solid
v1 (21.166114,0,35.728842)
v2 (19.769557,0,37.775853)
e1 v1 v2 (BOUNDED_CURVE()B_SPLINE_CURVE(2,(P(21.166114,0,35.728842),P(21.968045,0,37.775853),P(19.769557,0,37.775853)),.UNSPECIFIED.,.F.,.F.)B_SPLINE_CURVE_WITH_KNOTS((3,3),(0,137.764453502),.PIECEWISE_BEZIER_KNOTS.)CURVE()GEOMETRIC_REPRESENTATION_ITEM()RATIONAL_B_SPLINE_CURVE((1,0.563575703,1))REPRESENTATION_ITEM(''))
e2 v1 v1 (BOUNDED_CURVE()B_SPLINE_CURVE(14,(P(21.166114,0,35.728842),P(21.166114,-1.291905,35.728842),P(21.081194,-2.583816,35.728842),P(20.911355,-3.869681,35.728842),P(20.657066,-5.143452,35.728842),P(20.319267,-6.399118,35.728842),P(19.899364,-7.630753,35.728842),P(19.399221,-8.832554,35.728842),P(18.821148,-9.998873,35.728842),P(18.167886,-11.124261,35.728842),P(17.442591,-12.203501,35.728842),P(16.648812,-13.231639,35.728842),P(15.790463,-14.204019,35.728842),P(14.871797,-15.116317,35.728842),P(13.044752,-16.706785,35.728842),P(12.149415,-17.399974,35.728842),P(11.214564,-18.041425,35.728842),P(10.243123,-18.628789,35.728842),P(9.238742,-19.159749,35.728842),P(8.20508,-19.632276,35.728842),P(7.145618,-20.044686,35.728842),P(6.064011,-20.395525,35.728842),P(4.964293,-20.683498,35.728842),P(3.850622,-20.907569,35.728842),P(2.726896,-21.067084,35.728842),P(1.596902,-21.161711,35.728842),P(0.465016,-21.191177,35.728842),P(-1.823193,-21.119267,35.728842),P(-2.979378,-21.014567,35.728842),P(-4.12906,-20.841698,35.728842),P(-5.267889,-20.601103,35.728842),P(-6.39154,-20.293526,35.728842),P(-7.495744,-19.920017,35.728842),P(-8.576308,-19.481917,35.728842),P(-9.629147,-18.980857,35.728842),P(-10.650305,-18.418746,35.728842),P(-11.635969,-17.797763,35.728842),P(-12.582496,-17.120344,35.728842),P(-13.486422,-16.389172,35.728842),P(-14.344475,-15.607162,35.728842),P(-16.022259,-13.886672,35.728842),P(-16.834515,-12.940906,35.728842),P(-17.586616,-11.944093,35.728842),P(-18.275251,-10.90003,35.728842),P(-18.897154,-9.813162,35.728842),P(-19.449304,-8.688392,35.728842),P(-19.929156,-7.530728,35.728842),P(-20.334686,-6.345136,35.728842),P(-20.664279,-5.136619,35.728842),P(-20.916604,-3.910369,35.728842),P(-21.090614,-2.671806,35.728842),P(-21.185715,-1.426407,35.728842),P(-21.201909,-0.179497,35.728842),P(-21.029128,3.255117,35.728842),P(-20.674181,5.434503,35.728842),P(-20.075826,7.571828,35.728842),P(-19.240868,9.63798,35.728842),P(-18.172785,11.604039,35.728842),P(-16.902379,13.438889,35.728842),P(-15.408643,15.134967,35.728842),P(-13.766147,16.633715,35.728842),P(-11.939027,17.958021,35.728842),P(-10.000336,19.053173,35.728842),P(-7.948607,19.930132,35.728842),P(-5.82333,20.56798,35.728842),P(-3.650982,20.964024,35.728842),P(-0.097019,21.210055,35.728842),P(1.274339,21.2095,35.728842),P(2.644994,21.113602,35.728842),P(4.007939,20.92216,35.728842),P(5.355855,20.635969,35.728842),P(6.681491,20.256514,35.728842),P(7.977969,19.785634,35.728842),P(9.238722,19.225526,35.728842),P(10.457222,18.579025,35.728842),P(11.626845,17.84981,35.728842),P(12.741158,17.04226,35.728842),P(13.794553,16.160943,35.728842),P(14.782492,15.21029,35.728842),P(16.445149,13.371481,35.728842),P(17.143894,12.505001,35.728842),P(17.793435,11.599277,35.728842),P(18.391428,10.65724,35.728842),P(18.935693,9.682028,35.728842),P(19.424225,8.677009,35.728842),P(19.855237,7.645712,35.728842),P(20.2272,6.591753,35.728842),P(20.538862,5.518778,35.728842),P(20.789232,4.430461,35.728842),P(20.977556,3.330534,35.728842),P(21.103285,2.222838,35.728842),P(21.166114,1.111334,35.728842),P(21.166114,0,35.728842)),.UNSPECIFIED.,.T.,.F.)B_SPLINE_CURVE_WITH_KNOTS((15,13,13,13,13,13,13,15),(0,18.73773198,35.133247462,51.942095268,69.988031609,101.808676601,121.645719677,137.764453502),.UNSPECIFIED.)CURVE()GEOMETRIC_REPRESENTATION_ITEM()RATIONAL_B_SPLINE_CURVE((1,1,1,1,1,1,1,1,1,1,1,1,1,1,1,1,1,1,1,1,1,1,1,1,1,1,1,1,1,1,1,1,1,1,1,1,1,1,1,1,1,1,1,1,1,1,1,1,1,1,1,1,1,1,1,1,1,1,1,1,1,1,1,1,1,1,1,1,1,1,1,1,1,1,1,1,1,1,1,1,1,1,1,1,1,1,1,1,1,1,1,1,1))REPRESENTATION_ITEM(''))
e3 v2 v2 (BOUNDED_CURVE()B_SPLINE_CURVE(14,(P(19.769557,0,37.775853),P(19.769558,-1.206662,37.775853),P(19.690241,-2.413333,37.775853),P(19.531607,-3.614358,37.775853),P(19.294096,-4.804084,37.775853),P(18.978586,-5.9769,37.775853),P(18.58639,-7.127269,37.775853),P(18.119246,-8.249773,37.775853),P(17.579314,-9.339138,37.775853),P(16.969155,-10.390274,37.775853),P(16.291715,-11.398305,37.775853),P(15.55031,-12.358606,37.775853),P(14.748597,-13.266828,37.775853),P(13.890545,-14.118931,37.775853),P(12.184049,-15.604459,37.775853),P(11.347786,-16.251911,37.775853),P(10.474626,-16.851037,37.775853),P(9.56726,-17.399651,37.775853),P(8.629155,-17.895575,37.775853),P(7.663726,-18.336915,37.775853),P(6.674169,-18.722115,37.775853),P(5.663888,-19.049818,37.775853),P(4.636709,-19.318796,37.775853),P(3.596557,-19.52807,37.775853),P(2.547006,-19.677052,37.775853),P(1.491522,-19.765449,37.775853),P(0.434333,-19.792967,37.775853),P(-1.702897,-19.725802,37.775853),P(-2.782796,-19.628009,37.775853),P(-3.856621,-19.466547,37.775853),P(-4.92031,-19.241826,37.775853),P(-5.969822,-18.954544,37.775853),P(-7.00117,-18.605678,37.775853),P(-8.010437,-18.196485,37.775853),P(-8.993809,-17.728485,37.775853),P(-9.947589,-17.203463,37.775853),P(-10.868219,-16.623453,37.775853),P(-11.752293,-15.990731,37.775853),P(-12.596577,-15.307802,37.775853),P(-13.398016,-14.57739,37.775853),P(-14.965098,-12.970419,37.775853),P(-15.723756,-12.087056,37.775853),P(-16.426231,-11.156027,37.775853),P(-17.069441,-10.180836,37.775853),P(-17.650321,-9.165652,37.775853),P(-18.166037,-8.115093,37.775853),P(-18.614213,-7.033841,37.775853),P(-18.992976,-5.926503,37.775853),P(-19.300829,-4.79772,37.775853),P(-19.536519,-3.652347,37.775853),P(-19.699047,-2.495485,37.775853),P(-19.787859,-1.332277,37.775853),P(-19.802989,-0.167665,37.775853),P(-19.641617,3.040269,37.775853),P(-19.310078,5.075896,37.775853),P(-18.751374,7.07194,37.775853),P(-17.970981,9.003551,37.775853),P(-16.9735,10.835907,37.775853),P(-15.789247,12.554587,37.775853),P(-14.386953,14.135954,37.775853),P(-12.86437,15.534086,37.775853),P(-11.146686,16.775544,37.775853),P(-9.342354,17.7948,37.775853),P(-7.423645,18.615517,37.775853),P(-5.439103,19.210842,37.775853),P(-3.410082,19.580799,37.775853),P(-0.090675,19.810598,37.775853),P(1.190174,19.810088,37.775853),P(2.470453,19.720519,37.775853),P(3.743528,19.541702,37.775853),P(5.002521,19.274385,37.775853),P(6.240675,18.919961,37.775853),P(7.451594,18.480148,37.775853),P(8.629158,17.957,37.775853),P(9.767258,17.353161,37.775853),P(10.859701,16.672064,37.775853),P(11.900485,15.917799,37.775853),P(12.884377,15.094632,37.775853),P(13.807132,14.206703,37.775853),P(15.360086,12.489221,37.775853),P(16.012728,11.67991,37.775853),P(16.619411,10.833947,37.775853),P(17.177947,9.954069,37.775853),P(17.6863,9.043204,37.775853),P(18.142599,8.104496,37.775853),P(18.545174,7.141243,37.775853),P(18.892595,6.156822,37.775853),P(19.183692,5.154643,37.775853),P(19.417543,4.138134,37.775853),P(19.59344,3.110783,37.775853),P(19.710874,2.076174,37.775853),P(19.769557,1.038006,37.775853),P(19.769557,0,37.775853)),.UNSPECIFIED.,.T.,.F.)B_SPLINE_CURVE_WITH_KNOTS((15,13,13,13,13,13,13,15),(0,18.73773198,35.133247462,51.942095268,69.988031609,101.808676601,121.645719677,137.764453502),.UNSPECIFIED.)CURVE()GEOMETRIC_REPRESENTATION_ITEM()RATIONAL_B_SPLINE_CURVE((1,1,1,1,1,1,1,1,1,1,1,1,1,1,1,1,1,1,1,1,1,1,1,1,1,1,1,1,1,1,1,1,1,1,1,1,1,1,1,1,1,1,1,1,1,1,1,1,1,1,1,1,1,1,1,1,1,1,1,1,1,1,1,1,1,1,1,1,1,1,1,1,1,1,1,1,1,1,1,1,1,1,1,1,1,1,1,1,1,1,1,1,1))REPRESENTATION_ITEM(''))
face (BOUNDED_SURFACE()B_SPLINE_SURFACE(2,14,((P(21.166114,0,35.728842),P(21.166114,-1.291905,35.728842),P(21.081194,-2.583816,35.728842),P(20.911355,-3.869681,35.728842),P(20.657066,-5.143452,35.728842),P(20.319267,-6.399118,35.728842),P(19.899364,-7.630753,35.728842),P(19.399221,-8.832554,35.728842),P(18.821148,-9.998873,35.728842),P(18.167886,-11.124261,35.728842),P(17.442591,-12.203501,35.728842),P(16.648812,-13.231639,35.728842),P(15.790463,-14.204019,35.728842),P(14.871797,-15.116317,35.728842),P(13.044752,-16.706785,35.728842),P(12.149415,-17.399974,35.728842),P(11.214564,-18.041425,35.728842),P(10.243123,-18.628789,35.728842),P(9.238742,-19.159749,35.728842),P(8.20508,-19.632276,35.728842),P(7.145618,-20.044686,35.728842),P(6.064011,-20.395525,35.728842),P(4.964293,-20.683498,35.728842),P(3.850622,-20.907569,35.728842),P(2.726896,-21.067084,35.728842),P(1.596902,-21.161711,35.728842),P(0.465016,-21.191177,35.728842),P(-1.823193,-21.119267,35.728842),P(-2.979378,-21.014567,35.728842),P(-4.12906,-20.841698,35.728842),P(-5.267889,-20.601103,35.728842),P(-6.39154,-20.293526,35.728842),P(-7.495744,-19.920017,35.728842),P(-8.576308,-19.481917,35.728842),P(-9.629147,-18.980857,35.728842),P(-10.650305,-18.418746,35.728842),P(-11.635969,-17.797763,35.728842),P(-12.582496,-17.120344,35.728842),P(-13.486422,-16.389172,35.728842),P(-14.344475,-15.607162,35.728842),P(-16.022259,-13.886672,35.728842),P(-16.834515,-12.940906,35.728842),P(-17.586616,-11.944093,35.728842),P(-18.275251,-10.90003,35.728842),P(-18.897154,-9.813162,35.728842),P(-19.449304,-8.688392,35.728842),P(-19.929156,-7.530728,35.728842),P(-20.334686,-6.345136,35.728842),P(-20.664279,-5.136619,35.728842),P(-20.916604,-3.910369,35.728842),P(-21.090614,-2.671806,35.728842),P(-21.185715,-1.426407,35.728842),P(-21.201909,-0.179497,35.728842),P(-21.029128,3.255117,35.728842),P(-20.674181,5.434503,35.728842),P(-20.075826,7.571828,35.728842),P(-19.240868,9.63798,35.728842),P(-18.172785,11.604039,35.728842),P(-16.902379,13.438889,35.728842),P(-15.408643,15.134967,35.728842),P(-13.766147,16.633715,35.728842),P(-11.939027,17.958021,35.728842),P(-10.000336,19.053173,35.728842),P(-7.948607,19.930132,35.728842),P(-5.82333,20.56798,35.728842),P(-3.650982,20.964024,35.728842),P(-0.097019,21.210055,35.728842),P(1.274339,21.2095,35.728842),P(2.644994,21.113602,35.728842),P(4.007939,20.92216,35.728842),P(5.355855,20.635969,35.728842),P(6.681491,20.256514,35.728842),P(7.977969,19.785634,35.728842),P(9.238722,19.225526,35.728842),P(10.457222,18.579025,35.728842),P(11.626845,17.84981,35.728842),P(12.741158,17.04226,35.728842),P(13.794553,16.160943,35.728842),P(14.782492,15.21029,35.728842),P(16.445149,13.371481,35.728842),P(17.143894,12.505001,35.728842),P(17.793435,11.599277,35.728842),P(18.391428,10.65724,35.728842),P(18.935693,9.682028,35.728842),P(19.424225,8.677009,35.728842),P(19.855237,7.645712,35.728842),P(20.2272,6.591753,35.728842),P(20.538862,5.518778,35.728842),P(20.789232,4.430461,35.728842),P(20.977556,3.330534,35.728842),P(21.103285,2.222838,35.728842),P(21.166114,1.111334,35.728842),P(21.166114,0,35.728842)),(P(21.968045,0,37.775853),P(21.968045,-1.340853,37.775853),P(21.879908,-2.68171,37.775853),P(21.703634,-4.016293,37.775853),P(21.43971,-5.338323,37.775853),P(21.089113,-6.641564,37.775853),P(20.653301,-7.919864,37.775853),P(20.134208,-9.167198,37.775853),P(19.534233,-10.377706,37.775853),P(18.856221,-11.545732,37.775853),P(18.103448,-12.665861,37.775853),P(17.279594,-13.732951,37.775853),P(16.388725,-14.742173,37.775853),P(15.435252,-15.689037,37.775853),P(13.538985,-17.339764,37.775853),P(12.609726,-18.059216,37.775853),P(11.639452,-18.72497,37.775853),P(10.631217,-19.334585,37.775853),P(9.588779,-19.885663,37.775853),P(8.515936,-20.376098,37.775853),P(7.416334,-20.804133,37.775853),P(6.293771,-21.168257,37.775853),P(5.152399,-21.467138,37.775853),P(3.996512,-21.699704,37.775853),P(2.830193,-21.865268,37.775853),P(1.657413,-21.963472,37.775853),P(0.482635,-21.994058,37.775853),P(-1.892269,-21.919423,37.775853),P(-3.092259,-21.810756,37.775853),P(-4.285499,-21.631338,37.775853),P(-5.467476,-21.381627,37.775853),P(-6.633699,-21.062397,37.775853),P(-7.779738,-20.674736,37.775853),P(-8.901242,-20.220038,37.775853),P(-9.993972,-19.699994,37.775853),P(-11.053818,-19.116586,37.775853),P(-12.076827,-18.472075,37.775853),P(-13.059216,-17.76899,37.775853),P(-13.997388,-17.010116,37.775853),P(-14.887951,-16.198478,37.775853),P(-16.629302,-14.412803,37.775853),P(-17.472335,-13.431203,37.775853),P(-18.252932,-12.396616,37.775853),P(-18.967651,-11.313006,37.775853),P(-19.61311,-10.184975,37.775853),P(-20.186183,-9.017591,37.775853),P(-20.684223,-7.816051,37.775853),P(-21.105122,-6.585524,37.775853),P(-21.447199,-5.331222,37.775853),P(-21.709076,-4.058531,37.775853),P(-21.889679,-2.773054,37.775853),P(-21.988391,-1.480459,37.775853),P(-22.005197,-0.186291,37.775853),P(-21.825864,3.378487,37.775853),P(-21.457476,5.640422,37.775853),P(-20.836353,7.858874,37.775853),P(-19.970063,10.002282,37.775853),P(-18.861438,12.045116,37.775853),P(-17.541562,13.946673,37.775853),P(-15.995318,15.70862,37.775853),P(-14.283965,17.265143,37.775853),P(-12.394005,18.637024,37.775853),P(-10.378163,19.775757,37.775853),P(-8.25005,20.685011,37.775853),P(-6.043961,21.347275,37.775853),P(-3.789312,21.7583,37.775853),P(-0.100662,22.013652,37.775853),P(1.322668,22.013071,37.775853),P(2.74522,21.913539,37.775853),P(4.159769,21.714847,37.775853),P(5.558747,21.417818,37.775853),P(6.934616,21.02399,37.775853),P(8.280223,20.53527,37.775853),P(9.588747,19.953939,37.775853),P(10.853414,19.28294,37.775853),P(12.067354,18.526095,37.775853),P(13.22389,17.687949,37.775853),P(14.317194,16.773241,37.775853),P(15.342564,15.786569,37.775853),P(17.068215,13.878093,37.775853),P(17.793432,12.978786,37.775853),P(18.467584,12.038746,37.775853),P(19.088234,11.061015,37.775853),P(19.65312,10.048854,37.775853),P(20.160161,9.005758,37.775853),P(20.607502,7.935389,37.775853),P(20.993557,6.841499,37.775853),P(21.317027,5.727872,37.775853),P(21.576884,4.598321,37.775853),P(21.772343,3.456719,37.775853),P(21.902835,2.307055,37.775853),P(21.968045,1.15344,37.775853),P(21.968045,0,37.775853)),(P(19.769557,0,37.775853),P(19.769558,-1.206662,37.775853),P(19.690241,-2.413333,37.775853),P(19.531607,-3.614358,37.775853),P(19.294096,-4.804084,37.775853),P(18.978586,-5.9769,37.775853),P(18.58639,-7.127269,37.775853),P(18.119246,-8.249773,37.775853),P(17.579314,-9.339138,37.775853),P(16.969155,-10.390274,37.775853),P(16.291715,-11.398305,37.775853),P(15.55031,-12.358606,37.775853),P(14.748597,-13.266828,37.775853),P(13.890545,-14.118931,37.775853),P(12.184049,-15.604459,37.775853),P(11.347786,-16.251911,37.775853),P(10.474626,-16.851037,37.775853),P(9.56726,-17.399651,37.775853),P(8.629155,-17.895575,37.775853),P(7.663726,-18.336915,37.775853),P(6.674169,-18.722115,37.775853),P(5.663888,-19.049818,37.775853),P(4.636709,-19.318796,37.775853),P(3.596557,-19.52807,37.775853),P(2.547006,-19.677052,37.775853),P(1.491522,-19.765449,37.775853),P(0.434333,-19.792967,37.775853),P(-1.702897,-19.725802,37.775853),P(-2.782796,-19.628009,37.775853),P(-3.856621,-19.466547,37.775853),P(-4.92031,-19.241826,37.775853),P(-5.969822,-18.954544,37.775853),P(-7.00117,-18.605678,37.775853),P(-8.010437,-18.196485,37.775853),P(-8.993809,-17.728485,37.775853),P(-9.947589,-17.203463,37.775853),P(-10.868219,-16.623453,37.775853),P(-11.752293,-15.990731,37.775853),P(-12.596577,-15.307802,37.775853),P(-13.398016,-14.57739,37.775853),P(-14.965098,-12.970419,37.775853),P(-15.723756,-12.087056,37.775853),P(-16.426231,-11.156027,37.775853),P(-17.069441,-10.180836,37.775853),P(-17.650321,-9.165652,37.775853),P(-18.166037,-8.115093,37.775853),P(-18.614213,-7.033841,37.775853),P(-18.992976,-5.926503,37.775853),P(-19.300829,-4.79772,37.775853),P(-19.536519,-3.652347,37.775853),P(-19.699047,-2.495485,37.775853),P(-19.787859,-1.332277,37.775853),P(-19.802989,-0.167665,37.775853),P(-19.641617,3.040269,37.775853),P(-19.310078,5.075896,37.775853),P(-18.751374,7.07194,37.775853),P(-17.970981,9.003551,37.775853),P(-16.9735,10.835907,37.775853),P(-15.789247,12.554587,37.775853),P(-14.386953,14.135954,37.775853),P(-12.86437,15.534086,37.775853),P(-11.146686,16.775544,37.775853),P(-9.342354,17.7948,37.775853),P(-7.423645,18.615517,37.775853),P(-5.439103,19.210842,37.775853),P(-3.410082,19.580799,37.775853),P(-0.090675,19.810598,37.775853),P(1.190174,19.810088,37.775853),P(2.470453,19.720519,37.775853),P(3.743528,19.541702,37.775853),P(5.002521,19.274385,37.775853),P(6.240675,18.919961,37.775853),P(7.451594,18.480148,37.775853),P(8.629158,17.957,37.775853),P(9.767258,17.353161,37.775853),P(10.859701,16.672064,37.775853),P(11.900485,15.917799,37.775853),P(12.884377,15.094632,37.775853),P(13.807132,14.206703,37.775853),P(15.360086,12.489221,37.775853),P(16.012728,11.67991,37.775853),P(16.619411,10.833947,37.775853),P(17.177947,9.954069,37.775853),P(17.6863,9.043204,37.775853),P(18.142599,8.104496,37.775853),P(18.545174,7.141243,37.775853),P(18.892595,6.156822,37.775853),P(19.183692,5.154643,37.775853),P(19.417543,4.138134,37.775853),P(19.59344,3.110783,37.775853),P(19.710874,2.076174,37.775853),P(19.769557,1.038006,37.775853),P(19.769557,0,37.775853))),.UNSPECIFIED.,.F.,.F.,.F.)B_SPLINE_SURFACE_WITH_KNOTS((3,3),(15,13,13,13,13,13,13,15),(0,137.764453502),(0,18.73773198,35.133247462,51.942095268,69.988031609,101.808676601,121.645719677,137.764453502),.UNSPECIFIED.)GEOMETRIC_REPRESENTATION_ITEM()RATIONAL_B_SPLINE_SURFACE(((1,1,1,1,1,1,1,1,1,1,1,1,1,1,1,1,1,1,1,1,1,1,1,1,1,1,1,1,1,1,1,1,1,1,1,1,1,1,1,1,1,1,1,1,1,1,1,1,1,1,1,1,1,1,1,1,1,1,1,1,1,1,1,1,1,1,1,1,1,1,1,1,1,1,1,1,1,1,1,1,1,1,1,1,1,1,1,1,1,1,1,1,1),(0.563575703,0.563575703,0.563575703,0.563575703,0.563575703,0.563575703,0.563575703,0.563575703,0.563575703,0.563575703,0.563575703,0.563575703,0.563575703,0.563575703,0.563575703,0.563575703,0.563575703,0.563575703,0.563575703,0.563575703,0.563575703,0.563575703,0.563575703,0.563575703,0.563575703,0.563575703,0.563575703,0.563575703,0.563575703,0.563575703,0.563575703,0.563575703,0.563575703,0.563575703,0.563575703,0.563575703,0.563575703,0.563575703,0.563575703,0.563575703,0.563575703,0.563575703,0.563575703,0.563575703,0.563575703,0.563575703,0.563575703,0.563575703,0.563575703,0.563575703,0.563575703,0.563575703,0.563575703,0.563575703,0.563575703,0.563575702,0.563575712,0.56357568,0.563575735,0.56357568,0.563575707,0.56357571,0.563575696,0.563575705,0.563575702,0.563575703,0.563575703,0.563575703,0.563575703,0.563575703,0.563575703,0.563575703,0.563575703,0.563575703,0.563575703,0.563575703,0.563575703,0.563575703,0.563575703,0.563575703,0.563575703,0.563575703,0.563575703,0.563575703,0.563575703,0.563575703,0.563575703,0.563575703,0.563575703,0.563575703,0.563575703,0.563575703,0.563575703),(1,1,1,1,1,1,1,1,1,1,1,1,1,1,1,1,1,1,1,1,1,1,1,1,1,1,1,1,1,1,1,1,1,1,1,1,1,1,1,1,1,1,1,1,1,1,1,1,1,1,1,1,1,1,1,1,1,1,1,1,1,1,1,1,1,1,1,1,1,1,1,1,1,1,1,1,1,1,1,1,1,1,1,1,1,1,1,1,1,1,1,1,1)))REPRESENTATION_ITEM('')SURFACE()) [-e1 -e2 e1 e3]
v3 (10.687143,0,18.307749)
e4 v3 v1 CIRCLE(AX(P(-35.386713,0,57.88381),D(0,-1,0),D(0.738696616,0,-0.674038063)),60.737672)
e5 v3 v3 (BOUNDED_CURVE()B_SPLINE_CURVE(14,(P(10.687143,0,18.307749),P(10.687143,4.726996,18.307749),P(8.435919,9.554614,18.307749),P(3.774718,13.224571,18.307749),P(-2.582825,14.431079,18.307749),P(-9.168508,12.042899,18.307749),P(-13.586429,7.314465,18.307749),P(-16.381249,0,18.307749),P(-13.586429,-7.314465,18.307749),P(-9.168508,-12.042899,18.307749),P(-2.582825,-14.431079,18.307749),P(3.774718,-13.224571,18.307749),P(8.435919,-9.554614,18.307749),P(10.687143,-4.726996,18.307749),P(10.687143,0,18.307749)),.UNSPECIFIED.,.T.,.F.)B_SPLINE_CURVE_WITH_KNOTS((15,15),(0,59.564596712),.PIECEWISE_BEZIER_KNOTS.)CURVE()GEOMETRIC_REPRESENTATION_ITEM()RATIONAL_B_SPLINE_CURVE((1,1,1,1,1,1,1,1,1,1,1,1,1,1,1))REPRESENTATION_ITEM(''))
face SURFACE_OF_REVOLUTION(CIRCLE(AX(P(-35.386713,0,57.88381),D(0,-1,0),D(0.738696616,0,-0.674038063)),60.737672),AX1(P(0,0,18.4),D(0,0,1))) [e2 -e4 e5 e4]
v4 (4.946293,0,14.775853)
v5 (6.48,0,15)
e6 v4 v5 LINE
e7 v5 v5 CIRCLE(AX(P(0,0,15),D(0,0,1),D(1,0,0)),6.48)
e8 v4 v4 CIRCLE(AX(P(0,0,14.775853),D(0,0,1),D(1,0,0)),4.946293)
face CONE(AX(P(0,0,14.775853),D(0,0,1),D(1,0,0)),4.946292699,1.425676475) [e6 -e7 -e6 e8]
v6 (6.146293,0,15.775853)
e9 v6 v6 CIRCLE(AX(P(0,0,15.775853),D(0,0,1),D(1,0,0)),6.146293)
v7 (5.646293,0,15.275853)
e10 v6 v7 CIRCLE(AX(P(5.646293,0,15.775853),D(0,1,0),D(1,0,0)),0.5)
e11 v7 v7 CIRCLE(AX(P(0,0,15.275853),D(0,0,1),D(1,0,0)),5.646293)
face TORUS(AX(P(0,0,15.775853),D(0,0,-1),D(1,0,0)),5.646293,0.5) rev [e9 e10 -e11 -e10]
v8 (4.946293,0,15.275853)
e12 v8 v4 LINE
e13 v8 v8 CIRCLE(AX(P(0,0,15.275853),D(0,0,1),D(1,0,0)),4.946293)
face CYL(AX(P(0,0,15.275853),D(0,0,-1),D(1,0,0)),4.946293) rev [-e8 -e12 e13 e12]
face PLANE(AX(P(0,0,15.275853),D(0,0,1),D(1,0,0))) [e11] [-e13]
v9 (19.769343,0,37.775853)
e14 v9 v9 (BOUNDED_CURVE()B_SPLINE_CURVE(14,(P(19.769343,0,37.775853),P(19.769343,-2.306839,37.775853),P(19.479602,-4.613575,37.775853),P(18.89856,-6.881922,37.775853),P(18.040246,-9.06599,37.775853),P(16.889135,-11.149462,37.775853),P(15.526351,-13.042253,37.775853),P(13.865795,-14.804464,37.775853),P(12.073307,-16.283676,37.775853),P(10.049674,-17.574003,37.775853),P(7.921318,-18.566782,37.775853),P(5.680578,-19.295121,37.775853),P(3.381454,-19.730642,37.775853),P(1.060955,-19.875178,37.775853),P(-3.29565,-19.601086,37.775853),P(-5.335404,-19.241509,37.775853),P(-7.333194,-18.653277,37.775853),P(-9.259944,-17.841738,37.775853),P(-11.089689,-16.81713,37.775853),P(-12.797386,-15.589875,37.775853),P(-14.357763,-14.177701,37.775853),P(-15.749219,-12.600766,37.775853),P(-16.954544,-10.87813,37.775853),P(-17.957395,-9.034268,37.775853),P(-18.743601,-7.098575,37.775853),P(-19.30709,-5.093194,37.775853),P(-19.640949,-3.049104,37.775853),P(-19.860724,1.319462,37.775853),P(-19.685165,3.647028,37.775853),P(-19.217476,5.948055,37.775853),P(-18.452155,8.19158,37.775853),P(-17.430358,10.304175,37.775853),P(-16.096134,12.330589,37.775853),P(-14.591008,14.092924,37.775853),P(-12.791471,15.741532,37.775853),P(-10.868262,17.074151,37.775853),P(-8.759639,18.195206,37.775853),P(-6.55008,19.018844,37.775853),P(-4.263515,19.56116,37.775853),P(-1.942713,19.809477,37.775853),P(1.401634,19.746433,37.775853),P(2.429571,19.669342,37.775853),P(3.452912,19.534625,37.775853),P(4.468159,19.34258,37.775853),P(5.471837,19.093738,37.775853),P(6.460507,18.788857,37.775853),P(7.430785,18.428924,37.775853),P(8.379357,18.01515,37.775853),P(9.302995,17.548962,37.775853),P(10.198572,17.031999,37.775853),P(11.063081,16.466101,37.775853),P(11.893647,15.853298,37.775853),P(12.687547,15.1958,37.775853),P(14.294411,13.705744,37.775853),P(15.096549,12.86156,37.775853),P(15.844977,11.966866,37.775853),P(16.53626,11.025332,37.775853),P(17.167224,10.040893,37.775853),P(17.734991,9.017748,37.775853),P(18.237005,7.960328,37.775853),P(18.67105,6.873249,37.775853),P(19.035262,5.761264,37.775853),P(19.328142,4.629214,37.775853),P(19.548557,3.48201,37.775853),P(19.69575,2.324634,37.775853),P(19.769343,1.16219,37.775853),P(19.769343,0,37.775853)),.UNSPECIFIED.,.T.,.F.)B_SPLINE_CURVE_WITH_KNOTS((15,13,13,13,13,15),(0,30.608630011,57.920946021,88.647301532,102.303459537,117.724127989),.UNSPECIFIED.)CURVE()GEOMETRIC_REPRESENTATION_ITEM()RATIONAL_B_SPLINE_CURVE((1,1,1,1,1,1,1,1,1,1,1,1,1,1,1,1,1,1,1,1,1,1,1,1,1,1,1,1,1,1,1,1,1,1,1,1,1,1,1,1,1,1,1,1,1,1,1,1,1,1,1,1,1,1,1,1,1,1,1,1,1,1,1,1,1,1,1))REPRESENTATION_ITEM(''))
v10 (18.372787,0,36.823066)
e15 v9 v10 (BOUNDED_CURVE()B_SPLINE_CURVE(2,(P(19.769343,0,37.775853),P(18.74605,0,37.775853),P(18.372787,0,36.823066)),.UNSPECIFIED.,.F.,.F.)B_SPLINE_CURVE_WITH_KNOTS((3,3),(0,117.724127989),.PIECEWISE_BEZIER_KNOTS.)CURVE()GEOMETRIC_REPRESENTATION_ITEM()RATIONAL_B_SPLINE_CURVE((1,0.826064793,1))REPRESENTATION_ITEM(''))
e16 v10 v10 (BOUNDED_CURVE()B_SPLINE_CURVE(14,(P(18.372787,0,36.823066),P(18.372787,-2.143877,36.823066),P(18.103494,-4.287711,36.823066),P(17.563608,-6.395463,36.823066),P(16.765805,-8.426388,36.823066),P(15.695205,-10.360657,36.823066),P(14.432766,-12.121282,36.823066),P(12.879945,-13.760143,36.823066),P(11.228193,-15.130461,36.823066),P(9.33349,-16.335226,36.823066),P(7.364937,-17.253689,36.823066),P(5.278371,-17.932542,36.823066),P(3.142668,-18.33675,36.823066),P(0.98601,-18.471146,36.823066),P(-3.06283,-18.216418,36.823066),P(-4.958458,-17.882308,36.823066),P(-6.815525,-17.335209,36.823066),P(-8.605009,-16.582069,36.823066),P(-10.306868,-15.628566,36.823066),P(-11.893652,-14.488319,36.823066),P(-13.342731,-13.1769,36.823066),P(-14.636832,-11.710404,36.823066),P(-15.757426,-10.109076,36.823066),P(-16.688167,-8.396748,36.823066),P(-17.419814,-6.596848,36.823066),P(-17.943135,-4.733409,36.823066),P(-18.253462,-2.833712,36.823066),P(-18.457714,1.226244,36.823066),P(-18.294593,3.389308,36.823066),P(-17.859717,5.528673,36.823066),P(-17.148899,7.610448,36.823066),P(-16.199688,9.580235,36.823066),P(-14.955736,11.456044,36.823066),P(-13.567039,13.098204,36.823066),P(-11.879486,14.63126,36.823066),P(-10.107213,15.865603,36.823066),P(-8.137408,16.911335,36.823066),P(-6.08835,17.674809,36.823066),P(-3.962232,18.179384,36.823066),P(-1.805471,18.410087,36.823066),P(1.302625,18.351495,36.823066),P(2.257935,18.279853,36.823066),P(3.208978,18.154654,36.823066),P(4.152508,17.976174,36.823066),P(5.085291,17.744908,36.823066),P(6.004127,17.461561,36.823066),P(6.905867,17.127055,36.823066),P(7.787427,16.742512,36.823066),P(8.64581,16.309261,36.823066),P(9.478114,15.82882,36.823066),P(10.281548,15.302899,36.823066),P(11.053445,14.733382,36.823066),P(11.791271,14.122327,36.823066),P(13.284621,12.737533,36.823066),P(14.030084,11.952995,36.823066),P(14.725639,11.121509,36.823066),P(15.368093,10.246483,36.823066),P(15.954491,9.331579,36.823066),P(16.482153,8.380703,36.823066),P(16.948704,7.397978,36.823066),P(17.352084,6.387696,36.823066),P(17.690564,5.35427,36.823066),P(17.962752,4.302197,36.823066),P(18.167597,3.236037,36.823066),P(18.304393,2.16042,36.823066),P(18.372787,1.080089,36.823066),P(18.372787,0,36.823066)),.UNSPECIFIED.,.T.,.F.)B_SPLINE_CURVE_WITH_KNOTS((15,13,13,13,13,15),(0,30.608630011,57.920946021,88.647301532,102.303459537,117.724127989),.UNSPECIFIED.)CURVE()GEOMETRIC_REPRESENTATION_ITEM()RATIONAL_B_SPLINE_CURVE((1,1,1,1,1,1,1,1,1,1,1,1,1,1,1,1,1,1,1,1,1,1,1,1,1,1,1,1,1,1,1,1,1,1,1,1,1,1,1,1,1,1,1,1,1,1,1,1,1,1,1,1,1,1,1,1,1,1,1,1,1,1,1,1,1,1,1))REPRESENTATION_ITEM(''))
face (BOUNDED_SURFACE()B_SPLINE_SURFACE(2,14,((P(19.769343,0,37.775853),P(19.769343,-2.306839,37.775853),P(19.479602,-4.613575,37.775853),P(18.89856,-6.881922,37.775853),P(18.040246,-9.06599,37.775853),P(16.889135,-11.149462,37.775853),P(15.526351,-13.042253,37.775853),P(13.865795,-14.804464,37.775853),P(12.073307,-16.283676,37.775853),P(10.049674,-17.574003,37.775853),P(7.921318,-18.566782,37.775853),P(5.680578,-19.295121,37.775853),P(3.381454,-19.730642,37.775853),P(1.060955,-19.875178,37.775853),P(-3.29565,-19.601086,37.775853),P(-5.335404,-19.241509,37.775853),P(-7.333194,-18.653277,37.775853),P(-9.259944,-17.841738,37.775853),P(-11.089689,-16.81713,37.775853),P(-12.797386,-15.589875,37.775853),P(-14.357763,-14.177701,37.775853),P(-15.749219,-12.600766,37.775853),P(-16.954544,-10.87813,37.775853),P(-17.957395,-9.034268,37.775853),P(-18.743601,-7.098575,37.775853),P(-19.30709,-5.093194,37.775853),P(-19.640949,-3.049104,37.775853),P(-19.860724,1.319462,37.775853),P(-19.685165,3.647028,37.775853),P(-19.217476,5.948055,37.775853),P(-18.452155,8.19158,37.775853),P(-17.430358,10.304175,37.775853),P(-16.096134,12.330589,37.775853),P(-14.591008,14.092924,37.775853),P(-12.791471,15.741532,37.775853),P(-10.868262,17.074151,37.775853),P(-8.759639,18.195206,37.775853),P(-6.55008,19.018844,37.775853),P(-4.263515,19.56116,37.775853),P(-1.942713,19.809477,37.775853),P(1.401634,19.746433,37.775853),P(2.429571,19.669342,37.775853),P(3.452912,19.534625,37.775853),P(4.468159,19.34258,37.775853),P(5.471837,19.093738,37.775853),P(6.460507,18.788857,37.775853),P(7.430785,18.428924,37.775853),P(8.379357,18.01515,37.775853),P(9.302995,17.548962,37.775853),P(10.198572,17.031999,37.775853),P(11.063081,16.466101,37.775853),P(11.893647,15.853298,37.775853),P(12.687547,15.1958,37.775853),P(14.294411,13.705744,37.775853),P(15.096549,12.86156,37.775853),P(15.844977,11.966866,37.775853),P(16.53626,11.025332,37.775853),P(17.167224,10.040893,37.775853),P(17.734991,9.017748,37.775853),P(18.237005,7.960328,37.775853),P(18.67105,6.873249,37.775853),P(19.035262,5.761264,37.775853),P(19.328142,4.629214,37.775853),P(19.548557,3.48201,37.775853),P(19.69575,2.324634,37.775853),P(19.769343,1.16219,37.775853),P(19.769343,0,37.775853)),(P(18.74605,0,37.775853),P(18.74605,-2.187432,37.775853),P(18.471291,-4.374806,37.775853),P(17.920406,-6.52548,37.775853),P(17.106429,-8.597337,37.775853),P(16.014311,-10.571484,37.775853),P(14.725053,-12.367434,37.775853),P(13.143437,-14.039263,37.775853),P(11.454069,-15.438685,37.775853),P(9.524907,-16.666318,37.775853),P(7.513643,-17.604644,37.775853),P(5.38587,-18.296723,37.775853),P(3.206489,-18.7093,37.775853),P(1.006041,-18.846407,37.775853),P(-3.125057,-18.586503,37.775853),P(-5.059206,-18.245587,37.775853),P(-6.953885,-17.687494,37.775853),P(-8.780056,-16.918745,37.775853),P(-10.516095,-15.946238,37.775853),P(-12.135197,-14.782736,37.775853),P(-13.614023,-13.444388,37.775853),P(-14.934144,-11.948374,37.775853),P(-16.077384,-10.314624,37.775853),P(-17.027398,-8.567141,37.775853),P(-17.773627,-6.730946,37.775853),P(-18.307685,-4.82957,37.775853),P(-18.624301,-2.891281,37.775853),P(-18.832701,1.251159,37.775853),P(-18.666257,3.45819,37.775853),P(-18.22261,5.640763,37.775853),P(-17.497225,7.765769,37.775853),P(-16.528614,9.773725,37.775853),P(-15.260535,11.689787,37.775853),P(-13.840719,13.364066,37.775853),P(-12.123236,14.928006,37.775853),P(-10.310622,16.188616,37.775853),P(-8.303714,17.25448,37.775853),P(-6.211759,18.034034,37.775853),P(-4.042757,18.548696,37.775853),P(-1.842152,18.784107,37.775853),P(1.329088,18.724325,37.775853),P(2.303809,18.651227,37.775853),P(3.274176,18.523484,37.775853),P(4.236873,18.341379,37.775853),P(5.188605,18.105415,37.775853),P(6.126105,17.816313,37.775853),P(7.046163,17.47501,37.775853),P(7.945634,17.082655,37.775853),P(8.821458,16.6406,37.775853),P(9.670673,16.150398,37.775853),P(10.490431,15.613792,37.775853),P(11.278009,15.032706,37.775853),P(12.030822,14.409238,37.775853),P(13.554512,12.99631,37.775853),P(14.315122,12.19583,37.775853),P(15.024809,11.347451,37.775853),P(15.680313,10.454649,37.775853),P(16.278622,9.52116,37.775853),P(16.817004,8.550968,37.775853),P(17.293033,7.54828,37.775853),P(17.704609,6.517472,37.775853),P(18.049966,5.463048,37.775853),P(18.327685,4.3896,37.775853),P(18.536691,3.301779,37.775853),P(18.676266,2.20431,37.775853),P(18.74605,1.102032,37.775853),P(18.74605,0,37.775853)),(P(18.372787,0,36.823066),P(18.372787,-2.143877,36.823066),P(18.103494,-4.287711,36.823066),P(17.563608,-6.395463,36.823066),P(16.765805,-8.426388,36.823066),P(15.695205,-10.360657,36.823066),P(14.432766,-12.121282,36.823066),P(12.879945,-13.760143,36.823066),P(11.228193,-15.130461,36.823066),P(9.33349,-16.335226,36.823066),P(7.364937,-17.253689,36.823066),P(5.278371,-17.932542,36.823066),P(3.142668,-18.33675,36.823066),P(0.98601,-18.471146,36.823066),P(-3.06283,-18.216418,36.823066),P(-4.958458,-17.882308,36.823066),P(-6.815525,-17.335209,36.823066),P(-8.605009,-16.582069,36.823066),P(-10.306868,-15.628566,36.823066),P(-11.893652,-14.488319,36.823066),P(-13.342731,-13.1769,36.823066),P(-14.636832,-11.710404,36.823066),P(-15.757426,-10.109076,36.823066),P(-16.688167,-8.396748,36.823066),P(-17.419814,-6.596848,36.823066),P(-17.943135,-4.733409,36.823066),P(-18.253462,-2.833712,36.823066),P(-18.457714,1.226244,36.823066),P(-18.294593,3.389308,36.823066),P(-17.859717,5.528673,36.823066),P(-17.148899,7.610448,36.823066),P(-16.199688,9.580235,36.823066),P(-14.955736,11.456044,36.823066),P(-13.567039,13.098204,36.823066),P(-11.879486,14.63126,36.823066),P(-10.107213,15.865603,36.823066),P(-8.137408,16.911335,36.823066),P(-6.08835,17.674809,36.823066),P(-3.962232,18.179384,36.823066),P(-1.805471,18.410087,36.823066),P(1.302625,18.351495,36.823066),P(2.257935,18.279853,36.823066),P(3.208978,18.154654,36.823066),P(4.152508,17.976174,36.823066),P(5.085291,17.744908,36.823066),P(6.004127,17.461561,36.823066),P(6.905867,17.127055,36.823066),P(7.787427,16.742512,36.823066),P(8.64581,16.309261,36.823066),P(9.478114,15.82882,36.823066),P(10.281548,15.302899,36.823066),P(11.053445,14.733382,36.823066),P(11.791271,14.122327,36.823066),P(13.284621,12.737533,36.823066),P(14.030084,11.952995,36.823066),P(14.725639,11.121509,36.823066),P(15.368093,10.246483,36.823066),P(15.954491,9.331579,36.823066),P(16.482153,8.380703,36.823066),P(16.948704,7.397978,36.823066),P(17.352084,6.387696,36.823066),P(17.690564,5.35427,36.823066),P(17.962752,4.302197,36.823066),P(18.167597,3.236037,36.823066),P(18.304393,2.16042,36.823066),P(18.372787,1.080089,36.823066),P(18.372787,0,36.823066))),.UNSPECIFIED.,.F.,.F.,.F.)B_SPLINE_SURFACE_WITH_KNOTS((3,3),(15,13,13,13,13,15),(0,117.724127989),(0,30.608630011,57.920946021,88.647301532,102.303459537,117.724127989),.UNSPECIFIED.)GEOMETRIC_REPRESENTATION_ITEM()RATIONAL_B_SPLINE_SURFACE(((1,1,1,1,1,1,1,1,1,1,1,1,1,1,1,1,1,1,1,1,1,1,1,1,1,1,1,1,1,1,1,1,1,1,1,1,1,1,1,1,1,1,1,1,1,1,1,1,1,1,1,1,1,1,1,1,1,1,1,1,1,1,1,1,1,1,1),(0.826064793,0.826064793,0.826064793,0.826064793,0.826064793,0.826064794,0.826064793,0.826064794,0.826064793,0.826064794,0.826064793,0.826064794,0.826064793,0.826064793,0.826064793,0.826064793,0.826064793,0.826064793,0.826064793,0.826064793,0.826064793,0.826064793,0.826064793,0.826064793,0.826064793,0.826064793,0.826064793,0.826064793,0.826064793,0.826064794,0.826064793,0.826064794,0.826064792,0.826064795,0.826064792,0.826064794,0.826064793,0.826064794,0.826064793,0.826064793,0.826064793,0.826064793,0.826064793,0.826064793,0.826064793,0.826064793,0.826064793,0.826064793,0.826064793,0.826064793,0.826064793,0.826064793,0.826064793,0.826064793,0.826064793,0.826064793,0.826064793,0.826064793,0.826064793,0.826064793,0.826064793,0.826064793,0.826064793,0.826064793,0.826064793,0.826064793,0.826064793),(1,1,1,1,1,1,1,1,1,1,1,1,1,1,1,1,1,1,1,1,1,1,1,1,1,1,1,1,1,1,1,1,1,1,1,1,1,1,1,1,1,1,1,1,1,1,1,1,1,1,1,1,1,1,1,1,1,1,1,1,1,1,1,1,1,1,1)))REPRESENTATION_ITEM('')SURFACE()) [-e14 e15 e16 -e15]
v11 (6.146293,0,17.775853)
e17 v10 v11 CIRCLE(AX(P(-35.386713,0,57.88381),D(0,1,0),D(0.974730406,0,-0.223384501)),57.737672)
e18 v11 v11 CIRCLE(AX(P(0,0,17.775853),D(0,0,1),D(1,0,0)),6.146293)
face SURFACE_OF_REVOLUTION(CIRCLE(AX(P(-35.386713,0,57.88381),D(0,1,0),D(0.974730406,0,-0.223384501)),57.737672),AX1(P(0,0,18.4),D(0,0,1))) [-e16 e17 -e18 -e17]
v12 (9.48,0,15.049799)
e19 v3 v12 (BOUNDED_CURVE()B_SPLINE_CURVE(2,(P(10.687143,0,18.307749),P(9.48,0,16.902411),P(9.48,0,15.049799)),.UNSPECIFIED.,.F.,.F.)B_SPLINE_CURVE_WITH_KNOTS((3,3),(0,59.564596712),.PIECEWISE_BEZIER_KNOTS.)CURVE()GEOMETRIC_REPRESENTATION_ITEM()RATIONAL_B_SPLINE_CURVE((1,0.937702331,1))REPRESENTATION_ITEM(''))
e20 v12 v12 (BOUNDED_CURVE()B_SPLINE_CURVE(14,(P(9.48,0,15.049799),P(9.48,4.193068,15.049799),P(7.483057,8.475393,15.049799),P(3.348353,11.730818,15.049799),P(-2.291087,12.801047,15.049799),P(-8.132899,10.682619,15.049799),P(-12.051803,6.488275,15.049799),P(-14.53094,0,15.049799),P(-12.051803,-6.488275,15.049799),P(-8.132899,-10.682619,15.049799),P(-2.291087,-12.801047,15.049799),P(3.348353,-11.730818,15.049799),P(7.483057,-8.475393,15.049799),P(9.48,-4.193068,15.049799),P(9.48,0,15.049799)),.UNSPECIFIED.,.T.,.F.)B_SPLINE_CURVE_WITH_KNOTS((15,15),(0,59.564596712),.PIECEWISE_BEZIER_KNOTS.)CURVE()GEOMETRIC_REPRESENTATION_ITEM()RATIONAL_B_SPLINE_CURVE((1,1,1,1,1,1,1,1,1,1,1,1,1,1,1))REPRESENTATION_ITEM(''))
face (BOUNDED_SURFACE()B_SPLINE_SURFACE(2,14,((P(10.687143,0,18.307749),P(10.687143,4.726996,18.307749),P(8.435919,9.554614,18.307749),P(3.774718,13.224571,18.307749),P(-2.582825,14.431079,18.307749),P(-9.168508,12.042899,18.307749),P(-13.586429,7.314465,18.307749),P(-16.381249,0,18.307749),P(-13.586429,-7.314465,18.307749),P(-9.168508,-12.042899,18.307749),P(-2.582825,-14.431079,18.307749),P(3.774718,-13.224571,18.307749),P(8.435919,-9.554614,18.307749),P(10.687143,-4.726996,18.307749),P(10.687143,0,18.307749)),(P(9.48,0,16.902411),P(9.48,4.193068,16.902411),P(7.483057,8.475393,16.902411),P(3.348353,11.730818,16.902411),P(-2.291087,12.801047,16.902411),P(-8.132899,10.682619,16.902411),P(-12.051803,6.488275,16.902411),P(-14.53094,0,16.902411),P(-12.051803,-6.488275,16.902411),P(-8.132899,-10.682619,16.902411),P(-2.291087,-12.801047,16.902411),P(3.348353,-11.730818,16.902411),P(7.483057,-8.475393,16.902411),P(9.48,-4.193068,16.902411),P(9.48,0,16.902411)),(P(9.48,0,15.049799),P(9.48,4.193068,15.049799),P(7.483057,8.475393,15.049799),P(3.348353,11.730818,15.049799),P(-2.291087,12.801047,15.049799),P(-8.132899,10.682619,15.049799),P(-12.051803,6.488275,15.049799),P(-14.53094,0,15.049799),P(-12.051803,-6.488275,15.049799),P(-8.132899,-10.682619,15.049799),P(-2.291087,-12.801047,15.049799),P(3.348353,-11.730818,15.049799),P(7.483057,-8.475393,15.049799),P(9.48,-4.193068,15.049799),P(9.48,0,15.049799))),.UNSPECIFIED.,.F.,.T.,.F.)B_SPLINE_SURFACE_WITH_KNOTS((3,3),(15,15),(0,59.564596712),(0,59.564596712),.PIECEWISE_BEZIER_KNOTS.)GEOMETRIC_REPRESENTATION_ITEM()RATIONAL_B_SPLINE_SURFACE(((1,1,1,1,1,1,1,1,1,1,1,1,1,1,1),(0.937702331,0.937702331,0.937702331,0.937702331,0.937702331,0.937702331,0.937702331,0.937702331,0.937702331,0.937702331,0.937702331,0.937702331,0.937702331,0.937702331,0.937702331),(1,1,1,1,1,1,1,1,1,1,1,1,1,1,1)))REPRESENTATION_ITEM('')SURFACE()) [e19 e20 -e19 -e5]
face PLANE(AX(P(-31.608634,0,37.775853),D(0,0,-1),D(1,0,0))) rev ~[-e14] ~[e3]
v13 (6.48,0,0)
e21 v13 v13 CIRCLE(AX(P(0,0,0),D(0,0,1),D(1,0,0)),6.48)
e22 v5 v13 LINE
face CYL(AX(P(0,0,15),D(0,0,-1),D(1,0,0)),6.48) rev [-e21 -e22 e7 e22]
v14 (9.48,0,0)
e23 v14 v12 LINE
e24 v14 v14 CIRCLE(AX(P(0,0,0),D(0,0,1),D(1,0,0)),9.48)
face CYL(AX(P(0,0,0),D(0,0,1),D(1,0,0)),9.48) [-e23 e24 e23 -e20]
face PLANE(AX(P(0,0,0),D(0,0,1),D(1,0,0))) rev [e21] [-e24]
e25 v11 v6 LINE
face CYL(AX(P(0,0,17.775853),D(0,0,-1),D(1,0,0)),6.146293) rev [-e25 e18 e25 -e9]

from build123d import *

# Parameters (mm, degrees)
F2_W     = 70.9480602289
F2_H     = 11.2090441923
F3_DEPTH = 25
F4_R     = 1.4999
F5_R     = 5


# Not quite as in the source:
# - a fillet or chamfer is up to 0.001 mm smaller than in the source, because OpenCascade refuses the exact size


with BuildPart() as f1:
    # F0 (on Front) → F1 (revolve)
    with BuildSketch(Plane.XZ):
        with BuildLine():
            Line((6.48, 15), (6.48, 0))
            Line((6.48, 0), (9.48, 0))
            Line((9.48, 0), (9.48, 16.9443072909))
            ThreePointArc((9.48, 16.9443072909), (18.4709094822, 29.8049687465), (23.8669980317, 44.5398014486))
            Line((23.8669980317, 44.5398014486), (23.8669980317, 44.6510324618))
            ThreePointArc((23.8669980317, 44.6510324618), (23.4276582035, 45.7116926336), (22.3669980317, 46.1510324618))
            Line((22.3669980317, 46.1510324618), (22.3540474458, 46.1510324618))
            ThreePointArc((22.3540474458, 46.1510324618), (21.4193322825, 45.8241938162), (20.8919518365, 44.9861092131))
            ThreePointArc((20.8919518365, 44.9861092131), (15.376267951, 30.3745650676), (6.1462926992, 17.7758529155))
            Line((6.1462926992, 17.7758529155), (6.1462926992, 17.4685423841))
            Line((6.1462926992, 17.4685423841), (6.1462926992, 15.7758529155))
            ThreePointArc((6.1462926992, 15.7758529155), (5.9998460898, 15.4222995249), (5.6462926992, 15.2758529155))
            Line((5.6462926992, 15.2758529155), (4.9462926992, 15.2758529155))
            Line((4.9462926992, 15.2758529155), (4.9462926992, 14.7758529155))
            Line((4.9462926992, 14.7758529155), (6.48, 15))
        make_face()
    revolve(axis=Axis((0, 0, 18.4), (0, 0, 1)))

    # F2 (on Front) → F3 (cut, symmetric)
    with BuildSketch(Plane.XZ):
        with Locations((3.8653966039, 43.3803750116)):
            Rectangle(F2_W, F2_H)
    extrude(amount=F3_DEPTH, both=True, mode=Mode.SUBTRACT)

    # F4 (radius 1.5 in the source; OpenCascade refuses exactly that, so slightly less here)
    f4_edges = [f1.edges().sort_by_distance(p)[0] for p in [
        (-21.925894, 0, 37.775853),
        (-18.736377, 0, 37.775853),
    ]]
    fillet(f4_edges, radius=F4_R)

    # F5
    f5_edges = [f1.edges().sort_by_distance(p)[0] for p in [
        (-9.48, 0, 16.944307),
    ]]
    fillet(f5_edges, radius=F5_R)


solid = f1.part
